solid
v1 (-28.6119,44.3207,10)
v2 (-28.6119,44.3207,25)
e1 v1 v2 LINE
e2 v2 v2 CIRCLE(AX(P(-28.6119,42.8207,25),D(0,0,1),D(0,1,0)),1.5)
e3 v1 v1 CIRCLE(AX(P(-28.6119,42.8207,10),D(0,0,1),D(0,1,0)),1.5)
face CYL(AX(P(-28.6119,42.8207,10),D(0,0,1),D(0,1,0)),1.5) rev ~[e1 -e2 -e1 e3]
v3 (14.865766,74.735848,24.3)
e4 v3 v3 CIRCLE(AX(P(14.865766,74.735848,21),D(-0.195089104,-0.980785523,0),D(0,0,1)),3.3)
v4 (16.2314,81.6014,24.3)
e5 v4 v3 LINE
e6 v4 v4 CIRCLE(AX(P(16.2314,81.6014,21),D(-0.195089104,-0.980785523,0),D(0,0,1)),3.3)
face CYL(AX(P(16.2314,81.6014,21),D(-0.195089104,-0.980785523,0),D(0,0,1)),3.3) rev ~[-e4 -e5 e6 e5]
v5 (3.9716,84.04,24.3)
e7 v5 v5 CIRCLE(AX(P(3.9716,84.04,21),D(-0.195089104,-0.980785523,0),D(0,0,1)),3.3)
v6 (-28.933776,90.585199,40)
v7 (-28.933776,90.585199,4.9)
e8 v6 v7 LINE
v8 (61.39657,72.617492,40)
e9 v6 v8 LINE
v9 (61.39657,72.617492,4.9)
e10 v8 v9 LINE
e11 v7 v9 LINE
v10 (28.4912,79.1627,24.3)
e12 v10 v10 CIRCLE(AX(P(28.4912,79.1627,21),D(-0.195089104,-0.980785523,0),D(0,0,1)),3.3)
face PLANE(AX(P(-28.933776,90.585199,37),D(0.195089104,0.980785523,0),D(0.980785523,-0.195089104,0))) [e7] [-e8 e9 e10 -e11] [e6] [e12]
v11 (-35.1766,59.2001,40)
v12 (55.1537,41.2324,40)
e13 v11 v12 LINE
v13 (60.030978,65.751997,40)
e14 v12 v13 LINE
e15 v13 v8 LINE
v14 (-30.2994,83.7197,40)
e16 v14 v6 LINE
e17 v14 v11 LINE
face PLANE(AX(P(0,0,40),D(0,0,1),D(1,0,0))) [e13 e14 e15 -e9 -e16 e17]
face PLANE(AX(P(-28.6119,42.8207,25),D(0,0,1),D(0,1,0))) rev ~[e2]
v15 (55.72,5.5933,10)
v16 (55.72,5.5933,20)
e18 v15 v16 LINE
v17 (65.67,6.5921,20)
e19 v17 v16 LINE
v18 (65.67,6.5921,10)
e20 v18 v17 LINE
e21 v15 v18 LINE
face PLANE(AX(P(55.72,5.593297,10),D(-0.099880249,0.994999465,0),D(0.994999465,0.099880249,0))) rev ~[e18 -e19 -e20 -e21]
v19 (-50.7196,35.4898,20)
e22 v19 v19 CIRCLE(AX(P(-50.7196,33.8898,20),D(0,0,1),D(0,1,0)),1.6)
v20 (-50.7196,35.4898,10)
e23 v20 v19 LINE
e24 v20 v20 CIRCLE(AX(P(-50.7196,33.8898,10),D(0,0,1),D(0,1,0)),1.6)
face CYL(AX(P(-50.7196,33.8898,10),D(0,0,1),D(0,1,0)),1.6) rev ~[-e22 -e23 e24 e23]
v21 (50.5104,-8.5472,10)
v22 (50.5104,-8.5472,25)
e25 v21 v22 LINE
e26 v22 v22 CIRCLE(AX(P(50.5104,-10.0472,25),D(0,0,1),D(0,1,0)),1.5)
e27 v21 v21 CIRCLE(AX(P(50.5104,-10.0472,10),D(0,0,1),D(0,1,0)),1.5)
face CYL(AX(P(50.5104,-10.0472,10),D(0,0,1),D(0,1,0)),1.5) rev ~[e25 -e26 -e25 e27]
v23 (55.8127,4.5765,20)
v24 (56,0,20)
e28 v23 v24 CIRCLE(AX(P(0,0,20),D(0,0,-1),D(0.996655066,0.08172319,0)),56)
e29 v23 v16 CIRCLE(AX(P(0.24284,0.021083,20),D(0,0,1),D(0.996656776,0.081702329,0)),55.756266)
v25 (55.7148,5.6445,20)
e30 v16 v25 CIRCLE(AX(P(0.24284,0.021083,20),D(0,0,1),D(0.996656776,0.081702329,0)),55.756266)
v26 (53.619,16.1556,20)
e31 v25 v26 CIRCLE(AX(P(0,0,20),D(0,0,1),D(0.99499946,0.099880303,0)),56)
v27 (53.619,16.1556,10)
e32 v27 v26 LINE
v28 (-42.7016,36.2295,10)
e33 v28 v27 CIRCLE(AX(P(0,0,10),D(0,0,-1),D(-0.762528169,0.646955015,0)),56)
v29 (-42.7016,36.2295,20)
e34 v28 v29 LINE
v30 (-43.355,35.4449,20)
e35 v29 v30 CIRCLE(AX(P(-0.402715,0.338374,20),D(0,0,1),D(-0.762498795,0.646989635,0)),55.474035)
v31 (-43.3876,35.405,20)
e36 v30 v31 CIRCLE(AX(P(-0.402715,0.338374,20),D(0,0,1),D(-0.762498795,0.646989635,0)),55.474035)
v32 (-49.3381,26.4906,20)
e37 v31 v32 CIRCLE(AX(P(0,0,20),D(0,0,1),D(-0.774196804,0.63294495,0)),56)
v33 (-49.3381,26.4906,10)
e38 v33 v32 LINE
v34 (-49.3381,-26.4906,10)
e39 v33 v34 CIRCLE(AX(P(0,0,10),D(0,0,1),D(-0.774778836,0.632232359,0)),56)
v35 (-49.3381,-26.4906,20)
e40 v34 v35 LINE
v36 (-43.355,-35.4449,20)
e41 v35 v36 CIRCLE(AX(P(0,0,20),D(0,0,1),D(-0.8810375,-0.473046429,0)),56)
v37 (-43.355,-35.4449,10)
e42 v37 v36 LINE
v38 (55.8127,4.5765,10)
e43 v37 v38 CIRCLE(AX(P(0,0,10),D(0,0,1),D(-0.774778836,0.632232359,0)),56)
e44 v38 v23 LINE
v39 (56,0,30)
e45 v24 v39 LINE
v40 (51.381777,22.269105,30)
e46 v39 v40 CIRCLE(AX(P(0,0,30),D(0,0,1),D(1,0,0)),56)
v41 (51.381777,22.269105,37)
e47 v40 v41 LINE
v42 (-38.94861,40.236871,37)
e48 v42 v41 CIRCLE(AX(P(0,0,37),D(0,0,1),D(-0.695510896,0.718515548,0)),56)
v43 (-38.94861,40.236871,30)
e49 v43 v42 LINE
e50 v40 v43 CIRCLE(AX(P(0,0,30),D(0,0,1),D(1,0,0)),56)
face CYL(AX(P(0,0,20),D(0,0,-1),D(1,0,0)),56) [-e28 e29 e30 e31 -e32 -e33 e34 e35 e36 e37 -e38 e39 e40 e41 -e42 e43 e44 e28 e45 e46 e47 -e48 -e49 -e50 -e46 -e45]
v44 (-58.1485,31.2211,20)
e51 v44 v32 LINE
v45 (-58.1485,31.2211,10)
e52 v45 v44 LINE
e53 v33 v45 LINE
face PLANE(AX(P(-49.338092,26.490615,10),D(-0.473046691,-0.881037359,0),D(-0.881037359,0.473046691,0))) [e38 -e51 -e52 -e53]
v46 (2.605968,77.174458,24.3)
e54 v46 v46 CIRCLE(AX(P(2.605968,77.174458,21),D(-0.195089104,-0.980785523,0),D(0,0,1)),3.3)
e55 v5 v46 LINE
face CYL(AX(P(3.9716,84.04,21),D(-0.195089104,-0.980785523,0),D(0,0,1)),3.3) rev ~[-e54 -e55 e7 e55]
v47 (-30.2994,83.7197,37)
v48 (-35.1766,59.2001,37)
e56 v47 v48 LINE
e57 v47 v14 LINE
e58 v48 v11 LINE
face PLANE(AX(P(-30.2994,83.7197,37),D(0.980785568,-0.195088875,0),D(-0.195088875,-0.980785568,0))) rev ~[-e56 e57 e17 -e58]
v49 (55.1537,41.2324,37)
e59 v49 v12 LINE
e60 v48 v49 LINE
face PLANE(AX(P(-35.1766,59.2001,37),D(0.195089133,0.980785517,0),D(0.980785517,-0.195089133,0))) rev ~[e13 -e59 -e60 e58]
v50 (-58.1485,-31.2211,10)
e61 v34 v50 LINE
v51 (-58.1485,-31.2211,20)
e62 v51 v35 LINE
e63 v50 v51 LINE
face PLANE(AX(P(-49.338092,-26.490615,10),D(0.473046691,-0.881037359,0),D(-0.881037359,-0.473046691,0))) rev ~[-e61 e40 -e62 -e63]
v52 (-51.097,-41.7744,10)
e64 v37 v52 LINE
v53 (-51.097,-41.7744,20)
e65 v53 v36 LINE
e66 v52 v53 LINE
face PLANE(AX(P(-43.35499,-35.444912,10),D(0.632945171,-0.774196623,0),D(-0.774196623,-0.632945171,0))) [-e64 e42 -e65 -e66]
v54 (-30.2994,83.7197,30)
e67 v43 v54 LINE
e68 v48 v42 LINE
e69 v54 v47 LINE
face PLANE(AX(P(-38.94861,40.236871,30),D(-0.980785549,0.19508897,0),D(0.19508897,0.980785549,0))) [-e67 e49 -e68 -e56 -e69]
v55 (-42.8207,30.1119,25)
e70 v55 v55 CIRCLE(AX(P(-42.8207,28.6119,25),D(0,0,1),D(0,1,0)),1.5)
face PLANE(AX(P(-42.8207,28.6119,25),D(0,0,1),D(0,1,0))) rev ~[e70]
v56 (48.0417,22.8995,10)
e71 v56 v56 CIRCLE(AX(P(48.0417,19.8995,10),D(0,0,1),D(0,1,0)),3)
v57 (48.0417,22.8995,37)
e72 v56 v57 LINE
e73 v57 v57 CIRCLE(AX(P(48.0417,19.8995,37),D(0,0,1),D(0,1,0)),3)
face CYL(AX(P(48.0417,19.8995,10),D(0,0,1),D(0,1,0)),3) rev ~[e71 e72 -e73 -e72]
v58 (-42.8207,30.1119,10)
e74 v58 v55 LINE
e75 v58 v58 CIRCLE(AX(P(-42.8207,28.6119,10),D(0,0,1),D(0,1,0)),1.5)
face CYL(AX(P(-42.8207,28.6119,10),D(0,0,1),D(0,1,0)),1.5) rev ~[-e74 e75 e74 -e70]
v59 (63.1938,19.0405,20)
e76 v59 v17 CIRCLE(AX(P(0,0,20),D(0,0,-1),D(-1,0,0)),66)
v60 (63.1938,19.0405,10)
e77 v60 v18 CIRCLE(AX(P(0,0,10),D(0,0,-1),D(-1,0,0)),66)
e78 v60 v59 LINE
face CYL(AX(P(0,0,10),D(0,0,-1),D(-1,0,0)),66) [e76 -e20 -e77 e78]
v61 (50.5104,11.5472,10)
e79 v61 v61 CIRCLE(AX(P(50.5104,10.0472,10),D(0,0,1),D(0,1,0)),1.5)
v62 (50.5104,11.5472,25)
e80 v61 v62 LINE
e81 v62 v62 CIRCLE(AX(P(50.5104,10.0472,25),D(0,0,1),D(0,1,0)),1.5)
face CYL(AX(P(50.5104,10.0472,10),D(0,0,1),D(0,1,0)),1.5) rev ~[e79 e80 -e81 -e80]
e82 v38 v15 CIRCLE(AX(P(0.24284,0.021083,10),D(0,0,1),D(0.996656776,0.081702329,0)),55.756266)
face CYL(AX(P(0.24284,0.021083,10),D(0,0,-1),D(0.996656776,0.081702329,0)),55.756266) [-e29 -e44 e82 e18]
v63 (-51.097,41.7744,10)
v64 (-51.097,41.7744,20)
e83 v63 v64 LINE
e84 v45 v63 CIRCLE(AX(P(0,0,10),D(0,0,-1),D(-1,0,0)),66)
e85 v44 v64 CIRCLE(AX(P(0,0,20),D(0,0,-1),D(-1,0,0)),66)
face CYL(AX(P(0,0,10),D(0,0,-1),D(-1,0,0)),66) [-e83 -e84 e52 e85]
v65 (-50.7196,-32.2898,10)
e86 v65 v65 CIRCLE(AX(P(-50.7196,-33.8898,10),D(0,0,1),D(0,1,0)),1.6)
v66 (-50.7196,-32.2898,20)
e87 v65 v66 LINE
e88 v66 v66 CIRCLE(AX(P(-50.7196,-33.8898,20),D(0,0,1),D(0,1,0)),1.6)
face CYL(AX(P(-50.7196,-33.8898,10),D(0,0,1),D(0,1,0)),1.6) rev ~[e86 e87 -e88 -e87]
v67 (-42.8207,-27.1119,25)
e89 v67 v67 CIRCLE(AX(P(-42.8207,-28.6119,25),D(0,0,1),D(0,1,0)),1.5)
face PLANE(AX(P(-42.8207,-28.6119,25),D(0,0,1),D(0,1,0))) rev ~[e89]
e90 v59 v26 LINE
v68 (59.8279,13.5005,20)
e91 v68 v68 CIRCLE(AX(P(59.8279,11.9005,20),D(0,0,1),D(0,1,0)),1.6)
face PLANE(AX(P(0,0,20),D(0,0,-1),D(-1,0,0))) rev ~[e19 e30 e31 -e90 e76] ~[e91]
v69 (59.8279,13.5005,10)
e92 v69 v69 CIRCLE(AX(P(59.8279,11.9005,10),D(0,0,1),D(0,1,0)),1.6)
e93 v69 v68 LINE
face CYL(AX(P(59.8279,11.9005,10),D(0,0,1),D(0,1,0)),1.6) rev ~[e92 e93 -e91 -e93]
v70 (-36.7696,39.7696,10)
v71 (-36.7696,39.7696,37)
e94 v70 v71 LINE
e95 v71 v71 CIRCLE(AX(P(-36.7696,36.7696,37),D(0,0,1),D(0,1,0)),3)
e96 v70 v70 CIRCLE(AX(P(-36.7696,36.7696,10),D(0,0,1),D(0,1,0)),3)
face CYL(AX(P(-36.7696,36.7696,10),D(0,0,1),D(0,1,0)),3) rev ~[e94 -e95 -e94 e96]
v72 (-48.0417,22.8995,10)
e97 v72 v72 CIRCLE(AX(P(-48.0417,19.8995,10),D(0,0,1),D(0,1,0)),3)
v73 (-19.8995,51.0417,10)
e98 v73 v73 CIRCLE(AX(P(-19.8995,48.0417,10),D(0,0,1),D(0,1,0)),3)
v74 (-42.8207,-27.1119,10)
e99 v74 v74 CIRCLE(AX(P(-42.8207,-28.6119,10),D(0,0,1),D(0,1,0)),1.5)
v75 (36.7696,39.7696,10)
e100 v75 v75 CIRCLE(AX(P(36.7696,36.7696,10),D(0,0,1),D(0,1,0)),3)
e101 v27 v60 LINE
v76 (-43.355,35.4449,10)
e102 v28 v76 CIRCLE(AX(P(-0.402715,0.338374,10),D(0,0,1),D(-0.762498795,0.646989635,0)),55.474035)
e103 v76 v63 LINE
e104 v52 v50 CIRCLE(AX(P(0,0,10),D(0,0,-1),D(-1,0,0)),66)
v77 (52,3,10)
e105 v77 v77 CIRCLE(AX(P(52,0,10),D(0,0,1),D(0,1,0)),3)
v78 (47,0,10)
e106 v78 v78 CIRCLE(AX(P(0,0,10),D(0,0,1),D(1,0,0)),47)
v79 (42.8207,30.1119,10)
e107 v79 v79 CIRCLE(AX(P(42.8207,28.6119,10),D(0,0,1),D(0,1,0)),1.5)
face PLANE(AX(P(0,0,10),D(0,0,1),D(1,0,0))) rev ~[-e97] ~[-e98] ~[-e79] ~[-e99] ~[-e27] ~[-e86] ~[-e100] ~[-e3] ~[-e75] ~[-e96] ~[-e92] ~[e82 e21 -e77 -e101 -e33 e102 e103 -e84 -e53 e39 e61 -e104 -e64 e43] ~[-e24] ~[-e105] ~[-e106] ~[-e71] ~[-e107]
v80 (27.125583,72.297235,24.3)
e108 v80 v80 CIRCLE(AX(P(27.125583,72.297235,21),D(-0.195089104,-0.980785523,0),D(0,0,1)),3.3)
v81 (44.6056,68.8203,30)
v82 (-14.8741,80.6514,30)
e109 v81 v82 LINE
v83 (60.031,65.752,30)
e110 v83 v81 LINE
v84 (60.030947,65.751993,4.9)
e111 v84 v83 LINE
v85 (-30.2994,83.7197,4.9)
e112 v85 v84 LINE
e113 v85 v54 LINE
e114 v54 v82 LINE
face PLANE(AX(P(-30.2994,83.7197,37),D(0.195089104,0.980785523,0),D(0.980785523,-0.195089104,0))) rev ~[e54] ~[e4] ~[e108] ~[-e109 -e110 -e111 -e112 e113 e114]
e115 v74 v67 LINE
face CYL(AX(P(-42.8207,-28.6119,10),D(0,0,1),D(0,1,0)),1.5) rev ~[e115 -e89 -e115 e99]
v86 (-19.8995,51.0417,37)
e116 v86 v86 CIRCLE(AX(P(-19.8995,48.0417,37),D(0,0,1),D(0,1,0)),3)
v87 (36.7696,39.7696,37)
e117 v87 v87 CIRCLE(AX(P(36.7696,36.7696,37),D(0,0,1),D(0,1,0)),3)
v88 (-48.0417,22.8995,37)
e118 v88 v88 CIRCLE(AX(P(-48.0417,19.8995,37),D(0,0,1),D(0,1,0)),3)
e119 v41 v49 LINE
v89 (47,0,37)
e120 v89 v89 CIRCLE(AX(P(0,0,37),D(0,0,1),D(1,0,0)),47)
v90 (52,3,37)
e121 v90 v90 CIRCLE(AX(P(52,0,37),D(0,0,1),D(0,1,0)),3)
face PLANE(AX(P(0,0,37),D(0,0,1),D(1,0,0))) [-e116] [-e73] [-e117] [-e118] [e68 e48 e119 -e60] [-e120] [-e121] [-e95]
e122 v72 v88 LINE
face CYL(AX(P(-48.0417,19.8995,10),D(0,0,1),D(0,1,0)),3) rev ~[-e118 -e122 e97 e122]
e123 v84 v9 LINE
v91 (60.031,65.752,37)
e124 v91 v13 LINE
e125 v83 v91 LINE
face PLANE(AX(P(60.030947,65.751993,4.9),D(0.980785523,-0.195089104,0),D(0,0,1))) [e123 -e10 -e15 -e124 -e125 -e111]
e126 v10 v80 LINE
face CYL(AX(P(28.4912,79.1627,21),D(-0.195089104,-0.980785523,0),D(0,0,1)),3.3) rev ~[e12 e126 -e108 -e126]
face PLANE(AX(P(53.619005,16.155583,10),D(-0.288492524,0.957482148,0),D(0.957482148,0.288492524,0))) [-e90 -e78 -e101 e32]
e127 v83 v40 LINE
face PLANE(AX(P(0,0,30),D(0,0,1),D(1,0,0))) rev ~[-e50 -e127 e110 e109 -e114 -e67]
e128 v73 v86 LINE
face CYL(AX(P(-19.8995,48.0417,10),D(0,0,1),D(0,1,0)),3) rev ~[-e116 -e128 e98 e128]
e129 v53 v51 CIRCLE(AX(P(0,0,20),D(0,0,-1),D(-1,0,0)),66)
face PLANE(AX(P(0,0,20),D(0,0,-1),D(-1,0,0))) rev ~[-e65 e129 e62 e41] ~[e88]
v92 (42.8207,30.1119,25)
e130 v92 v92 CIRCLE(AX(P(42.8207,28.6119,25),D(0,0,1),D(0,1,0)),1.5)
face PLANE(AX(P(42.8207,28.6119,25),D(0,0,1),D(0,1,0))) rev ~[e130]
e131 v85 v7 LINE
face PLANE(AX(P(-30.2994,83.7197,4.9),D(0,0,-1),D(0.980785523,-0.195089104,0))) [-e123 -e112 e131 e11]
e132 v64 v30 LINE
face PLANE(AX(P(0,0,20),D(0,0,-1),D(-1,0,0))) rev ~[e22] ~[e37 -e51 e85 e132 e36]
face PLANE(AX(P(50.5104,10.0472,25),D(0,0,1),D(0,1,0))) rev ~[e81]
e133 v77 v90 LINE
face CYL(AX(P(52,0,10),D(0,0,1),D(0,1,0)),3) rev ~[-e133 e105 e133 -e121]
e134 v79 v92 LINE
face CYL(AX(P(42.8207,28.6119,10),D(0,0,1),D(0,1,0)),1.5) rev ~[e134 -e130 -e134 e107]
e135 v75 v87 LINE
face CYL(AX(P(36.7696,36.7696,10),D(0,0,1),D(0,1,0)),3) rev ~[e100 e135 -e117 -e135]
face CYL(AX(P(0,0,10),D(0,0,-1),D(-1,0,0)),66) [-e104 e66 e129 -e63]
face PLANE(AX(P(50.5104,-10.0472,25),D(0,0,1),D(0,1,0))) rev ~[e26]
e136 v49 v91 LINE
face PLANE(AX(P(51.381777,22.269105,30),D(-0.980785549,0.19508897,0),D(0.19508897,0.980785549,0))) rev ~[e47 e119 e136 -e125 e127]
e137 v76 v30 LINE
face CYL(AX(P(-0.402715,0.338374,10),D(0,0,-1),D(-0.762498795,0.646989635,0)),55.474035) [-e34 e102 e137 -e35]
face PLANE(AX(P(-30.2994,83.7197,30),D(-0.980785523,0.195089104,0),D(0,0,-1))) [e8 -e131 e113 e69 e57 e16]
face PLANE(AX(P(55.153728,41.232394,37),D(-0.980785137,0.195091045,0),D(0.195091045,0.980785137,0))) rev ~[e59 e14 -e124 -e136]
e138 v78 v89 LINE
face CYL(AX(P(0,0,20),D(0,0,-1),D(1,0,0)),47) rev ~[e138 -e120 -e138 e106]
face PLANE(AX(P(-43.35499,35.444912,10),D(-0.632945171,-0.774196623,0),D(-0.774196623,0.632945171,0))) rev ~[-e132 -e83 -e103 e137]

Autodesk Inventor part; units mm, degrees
sketch "Skizze1" plane through (0, 0, 0) normal (0, 0, 1) x (1, 0, 0)
  circle A0 centre (0, 0) radius 47
  circle A1 centre (0, 0) radius 56
  circle A2 centre (0, 0) radius 51.5
  circle A3 centre (-28.6119, 42.8207) radius 6
  circle A4 centre (-42.8207, 28.6119) radius 6
  circle A5 centre (42.8207, 28.6119) radius 6
  circle A6 centre (50.5104, 10.0472) radius 6
  circle A7 centre (-10.0472, -50.5104) radius 6
  circle A8 centre (-28.6119, 42.8207) radius 5
  circle A9 centre (-42.8207, 28.6119) radius 5
  circle A10 centre (-10.0472, -50.5104) radius 5
  circle A11 centre (50.5104, 10.0472) radius 5
  circle A12 centre (42.8207, 28.6119) radius 5
  line L0 (0, 0) -> (-25.4753, 49.8699)
  line L1 (0, 0) -> (-26.4443, 49.3629)
  line L2 (0, 0) -> (-36.3248, 42.6205)
  line L3 (0, 0) -> (-35.4856, 43.3218)
  line L4 (0, 0) -> (-42.6205, 36.3248)
  line L5 (0, 0) -> (-49.3629, 26.4443)
  line L6 (0, 0) -> (-49.8699, 25.4753)
  line L7 (0, 0) -> (-43.3218, 35.4856)
  line L8 (0, 0) -> (-16.2059, -53.6038)
  line L9 (0, 0) -> (-17.2496, -53.2771)
  line L10 (0, 0) -> (-5.541, -55.7252)
  line L11 (0, 0) -> (-4.4517, -55.8228)
  line L12 (0, 0) -> (43.3218, 35.4856)
  line L13 (0, 0) -> (42.6205, 36.3248)
  line L14 (0, 0) -> (49.3629, 26.4443)
  line L15 (0, 0) -> (49.8699, 25.4753)
  line L16 (0, 0) -> (53.6038, 16.2059)
  line L17 (0, 0) -> (53.2771, 17.2496)
  line L18 (0, 0) -> (55.7252, 5.541)
  line L19 (0, 0) -> (55.8228, 4.4517)
  line L20 (0, 0) -> (-54.924, 10.9251)
  line L21 (0, 0) -> (54.924, -10.9251)
  line L22 (0, 0) -> (10.0472, 50.5104)
  point P0 (0, 51.5)
  point P1 (-10.0472, 50.5104)
  point P2 (-19.7082, 47.5798)
  point P3 (-36.416, 36.416)
  point P4 (-47.5798, 19.7082)
  point P5 (-50.5104, 10.0472)
  point P6 (-51.5, 0)
  point P7 (-50.5104, -10.0472)
  point P8 (-47.5798, -19.7082)
  point P9 (-42.8207, -28.6119)
  point P10 (-36.416, -36.416)
  point P11 (-28.6119, -42.8207)
  point P12 (-19.7082, -47.5798)
  point P13 (0, -51.5)
  point P14 (10.0472, -50.5104)
  point P15 (19.7082, -47.5798)
  point P16 (28.6119, -42.8207)
  point P17 (36.416, -36.416)
  point P18 (42.8207, -28.6119)
  point P19 (47.5798, -19.7082)
  point P20 (50.5104, -10.0472)
  point P21 (51.5, 0)
  point P22 (47.5798, 19.7082)
  point P23 (36.416, 36.416)
  point P24 (28.6119, 42.8207)
  point P25 (19.7082, 47.5798)
  point P26 (-41.8551, 21.3811)
  point P27 (-41.4296, 22.1944)
  point P28 (-36.3593, 29.7825)
  point P29 (-35.7708, 30.4869)
  point P30 (-30.3782, 37.0866)
  point P31 (-30.4869, 35.7708)
  point P32 (-29.1766, 36.8473)
  point P33 (-22.6383, 42.2582)
  point P34 (-22.8771, 41.0565)
  point P35 (-21.3811, 41.8551)
  point P36 (-14.4773, -44.7147)
  point P37 (-13.6014, -44.9889)
  point P38 (-3.7363, -46.8513)
  point P39 (-4.6505, -46.7694)
  point P40 (46.7694, 4.6505)
  point P41 (46.8513, 3.7363)
  point P42 (44.7147, 14.4773)
  point P43 (44.9889, 13.6014)
  point P44 (41.4296, 22.1944)
  point P45 (41.8551, 21.3811)
  point P46 (35.7708, 30.4869)
  point P47 (36.3593, 29.7825)
  dimension "d1" = 112
  dimension "d2" = 103
  dimension "d0" = 94
  dimension "d5" = 360
  dimension "d7" = 12
  dimension "d8" = 12
  dimension "d9" = 12
  dimension "d10" = 12
  dimension "d11" = 12
  dimension "d12" = 10
  dimension "d13" = 10
  dimension "d14" = 10
  dimension "d15" = 10
  dimension "d16" = 10
ref_plane "Arbeitsebene1" through (0, 0, 10) normal (0, 0, 1) x (1, 0, 0)
sketch "Skizze2" plane through (0, 0, 10) normal (0, 0, 1) x (1, 0, 0)
  circle A0 centre (0, 0) radius 47
  circle A1 centre (0, 0) radius 56
  arc A2 (-42.7016, 36.2295) -> (-43.3876, 35.405) centre (0, 0) ccw projected
  line L0 (0, 0) -> (-25.5867, 49.8129)
  arc A3 (55.8127, 4.5765) -> (55.7148, 5.6445) centre (0, 0) ccw projected
  line L1 (-22.3883, 43.5863) -> (-25.5867, 49.8129) projected
  circle A4 centre (0, 0) radius 47
  circle A5 centre (0, 0) radius 56
  circle A6 centre (0, 0) radius 52.5
  line L2 (0, 0) -> (-25.5867, 49.8129)
  point P0 (-21.4745, 41.8072)
  point P1 (0, 52.5)
  point P2 (-10.2422, 51.4912)
  point P3 (-20.0909, 48.5037)
  point P4 (-29.1674, 43.6522)
  point P5 (-37.1231, 37.1231)
  point P6 (-43.6522, 29.1674)
  point P7 (-48.5037, 20.0909)
  point P8 (-51.4912, 10.2422)
  point P9 (-52.5, 0)
  point P10 (-51.4912, -10.2422)
  point P11 (-48.5037, -20.0909)
  point P12 (-43.6522, -29.1674)
  point P13 (-37.1231, -37.1231)
  point P14 (-29.1674, -43.6522)
  point P15 (-20.0909, -48.5037)
  point P16 (-10.2422, -51.4912)
  point P17 (0, -52.5)
  point P18 (10.2422, -51.4912)
  point P19 (20.0909, -48.5037)
  point P20 (29.1674, -43.6522)
  point P21 (37.1231, -37.1231)
  point P22 (43.6522, -29.1674)
  point P23 (48.5037, -20.0909)
  point P24 (51.4912, -10.2422)
  point P25 (52.5, 0)
  point P26 (51.4912, 10.2422)
  point P27 (48.5037, 20.0909)
  point P28 (43.6522, 29.1674)
  point P29 (37.1231, 37.1231)
  point P30 (29.1674, 43.6522)
  point P31 (20.0909, 48.5037)
  point P32 (10.2422, 51.4912)
  point P33 (-43.5863, 22.3883)
  point P34 (-43.1495, 23.219)
  point P35 (-37.9642, 30.9794)
  point P36 (-37.3639, 31.7008)
  point P37 (-30.9445, 37.9213)
  point P38 (-31.7008, 37.3639)
  point P39 (-31.0074, 37.9413)
  point P40 (-23.1928, 43.1008)
  point P41 (-23.1871, 43.1666)
  point P42 (-14.9892, -46.6511)
  point P43 (-14.093, -46.9296)
  point P44 (-4.0044, -48.8361)
  point P45 (-4.939, -48.7505)
  point P46 (48.7505, 4.939)
  point P47 (48.8361, 4.0044)
  point P48 (46.6511, 14.9892)
  point P49 (46.9296, 14.093)
  point P50 (43.1495, 23.219)
  point P51 (43.5863, 22.3883)
  point P52 (37.3639, 31.7008)
  point P53 (37.9642, 30.9794)
  dimension "d19" = 94
  dimension "d81" = 112
  dimension "d82" = 105
  dimension "d20" = 112
  dimension "d80" = 94
  dimension "d83" = 360
extrude "Extrusion2" add sketch "Skizze2" along normal blind 10 contours A1 | A6
ref_plane "Arbeitsebene2" through (0, 0, 20) normal (0, 0, 1) x (1, 0, 0)
sketch "Skizze3" plane through (0, 0, 20) normal (0, 0, 1) x (1, 0, 0)
  circle A0 centre (0, 0) radius 47
  circle A1 centre (0, 0) radius 56
  dimension "d30" = 94
  dimension "d31" = 112
extrude "Extrusion3" add sketch "Skizze3" along normal blind 10
ref_plane "Arbeitsebene3" through (0, 0, 30) normal (0, 0, 1) x (1, 0, 0)
sketch "Skizze4" plane through (0, 0, 30) normal (0, 0, 1) x (1, 0, 0)
  circle A0 centre (0, 0) radius 49 projected
  line L0 (-22.188, 43.8818) -> (37.2918, 32.0506)
  line L1 (37.2918, 32.0506) -> (44.6056, 68.8203)
  line L2 (44.6056, 68.8203) -> (-14.8741, 80.6514)
  line L3 (-14.8741, 80.6514) -> (-22.188, 43.8818)
  line L4 (44.6056, 68.8203) -> (37.2918, 32.0506)
  line L5 (37.2918, 32.0506) -> (52.7171, 28.9824)
  line L6 (48.4587, 7.5737) -> (60.031, 65.752)
  line L7 (60.031, 65.752) -> (44.6056, 68.8203)
  line L8 (-14.8741, 80.6514) -> (-22.188, 43.8818)
  line L9 (-22.188, 43.8818) -> (-37.6133, 46.9501)
  line L10 (-41.8717, 25.5414) -> (-30.2994, 83.7197)
  line L11 (-30.2994, 83.7197) -> (-14.8741, 80.6514)
  circle A1 centre (0, 0) radius 56
  circle A2 centre (0, 0) radius 47
  point P0 (-38.9486, 40.2369)
  point P1 (51.3817, 22.2692)
  point P2 (-22.174, 43.6957)
  point P3 (37.2076, 31.884)
  point P4 (-41.8227, 25.5317)
  point P5 (48.4096, 7.5835)
  point P6 (37.0169, 32.1053)
  point P7 (-21.9131, 43.8271)
  dimension "AuslegerBreite" = 92.1
  dimension "d34" = 37.49
  dimension "d37" = 15.7275
  dimension "d38" = 15.7275
  dimension "d39" = 92.1
  dimension "d40" = 60.645
  dimension "d55" = 112
  dimension "d136" = 98
  dimension "d137" = 94
  dimension "d138" = 76.2
extrude "Extrusion4" add sketch "Skizze4" along normal blind 7 contours A0 L0 A2 | A0 L0 L5 A1 L9 | L0 A2 A0 | A0 L0 L3 A1 L1 | L1 A1 L5 | L9 A1 L3 | A1 L3 L2 L1 | L1 L7 L6 L5 A1 | L5 L6 A1 | A1 L9 L10 L11 L3 | A1 L10 L9
ref_plane "Arbeitsebene4" through (0, 0, 45) normal (0, 0, 1) x (1, 0, 0)
sketch "Skizze7" plane through (0, 0, 10) normal (0, 0, 1) x (1, 0, 0)
  circle A0 centre (0, 0) radius 47
  circle A1 centre (0, 0) radius 56
  circle A2 centre (0, 0) radius 52.5
  circle A3 centre (-29.1674, 43.6522) radius 6
  circle A4 centre (-43.6522, 29.1674) radius 6
  circle A5 centre (43.6522, 29.1674) radius 6
  circle A6 centre (51.4912, 10.2422) radius 6
  circle A7 centre (-10.2422, -51.4912) radius 6
  circle A8 centre (-29.1674, 43.6522) radius 5
  circle A9 centre (-43.6522, 29.1674) radius 5
  circle A10 centre (-10.2422, -51.4912) radius 5
  circle A11 centre (51.4912, 10.2422) radius 5
  circle A12 centre (43.6522, 29.1674) radius 5
  line L0 (0, 0) -> (-25.5867, 49.8129)
  line L1 (0, 0) -> (-26.536, 49.3137)
  line L2 (0, 0) -> (-36.2295, 42.7016)
  line L3 (0, 0) -> (-35.405, 43.3876)
  line L4 (0, 0) -> (-42.7016, 36.2295)
  line L5 (0, 0) -> (-49.3137, 26.536)
  line L6 (0, 0) -> (-49.8129, 25.5867)
  line L7 (0, 0) -> (-43.3876, 35.405)
  line L8 (0, 0) -> (-16.1063, -53.6338)
  line L9 (0, 0) -> (-17.1305, -53.3155)
  line L10 (0, 0) -> (-5.6445, -55.7148)
  line L11 (0, 0) -> (-4.5765, -55.8127)
  line L12 (0, 0) -> (43.3876, 35.405)
  line L13 (0, 0) -> (42.7016, 36.2295)
  line L14 (0, 0) -> (49.3137, 26.536)
  line L15 (0, 0) -> (49.8129, 25.5867)
  line L16 (0, 0) -> (53.6338, 16.1063)
  line L17 (0, 0) -> (53.3155, 17.1305)
  line L18 (0, 0) -> (55.7148, 5.6445)
  line L19 (0, 0) -> (55.8127, 4.5765)
  line L20 (0, 0) -> (-54.924, 10.9251)
  line L21 (0, 0) -> (54.924, -10.9251)
  point P0 (0, 52.5)
  point P1 (-10.2422, 51.4912)
  point P2 (-20.0909, 48.5037)
  point P3 (-37.1231, 37.1231)
  point P4 (-48.5037, 20.0909)
  point P5 (-51.4912, 10.2422)
  point P6 (-52.5, 0)
  point P7 (-51.4912, -10.2422)
  point P8 (-48.5037, -20.0909)
  point P9 (-43.6522, -29.1674)
  point P10 (-37.1231, -37.1231)
  point P11 (-29.1674, -43.6522)
  point P12 (-20.0909, -48.5037)
  point P13 (0, -52.5)
  point P14 (10.2422, -51.4912)
  point P15 (20.0909, -48.5037)
  point P16 (29.1674, -43.6522)
  point P17 (37.1231, -37.1231)
  point P18 (43.6522, -29.1674)
  point P19 (48.5037, -20.0909)
  point P20 (51.4912, -10.2422)
  point P21 (52.5, 0)
  point P22 (48.5037, 20.0909)
  point P23 (37.1231, 37.1231)
  point P24 (29.1674, 43.6522)
  point P25 (20.0909, 48.5037)
  point P26 (10.2422, 51.4912)
  point P27 (-43.5863, 22.3883)
  point P28 (-43.1495, 23.219)
  point P29 (-37.9642, 30.9794)
  point P30 (-37.3639, 31.7008)
  point P31 (-30.9445, 37.9213)
  point P32 (-31.7008, 37.3639)
  point P33 (-31.0074, 37.9413)
  point P34 (-23.1928, 43.1008)
  point P35 (-23.1871, 43.1666)
  point P36 (-22.3883, 43.5863)
  point P37 (-14.9892, -46.6511)
  point P38 (-14.093, -46.9296)
  point P39 (-4.0044, -48.8361)
  point P40 (-4.939, -48.7505)
  point P41 (48.7505, 4.939)
  point P42 (48.8361, 4.0044)
  point P43 (46.6511, 14.9892)
  point P44 (46.9296, 14.093)
  point P45 (43.1495, 23.219)
  point P46 (43.5863, 22.3883)
  point P47 (37.3639, 31.7008)
  point P48 (37.9642, 30.9794)
  point P49 (51.4912, -10.2422)
  point P50 (52.3244, 4.2904)
  point P51 (-51.4912, 10.2422)
  point P52 (-46.0969, 9.1692)
  point P53 (-41.8072, 21.4745)
  point P54 (-46.6996, 23.9875)
  point P55 (46.0969, -9.1692)
  point P56 (46.8428, 3.8409)
  dimension "d59" = 112
  dimension "d60" = 105
  dimension "d58" = 94
  dimension "d61" = 360
  dimension "d62" = 12
  dimension "d63" = 12
  dimension "d64" = 12
  dimension "d65" = 12
  dimension "d66" = 12
  dimension "d67" = 10
  dimension "d68" = 10
  dimension "d69" = 10
  dimension "d70" = 10
  dimension "d71" = 10
sketch "Skizze8" plane through (0, 0, 10) normal (0, 0, -1) x (-1, 0, 0)
  circle A0 centre (0, 0) radius 47
  circle A1 centre (0, 0) radius 56
  circle A2 centre (0, 0) radius 52
  circle A3 centre (0, 52) radius 2.5
  circle A4 centre (-19.8995, 48.0417) radius 2.5
  circle A5 centre (-36.7696, 36.7696) radius 2.5
  circle A6 centre (-48.0417, 19.8995) radius 2.5
  circle A7 centre (-52, 0) radius 2.5
  circle A8 centre (-48.0417, -19.8995) radius 2.5
  circle A9 centre (-36.7696, -36.7696) radius 2.5
  circle A10 centre (-19.8995, -48.0417) radius 2.5
  circle A11 centre (0, -52) radius 2.5
  circle A12 centre (19.8995, -48.0417) radius 2.5
  circle A13 centre (36.7696, -36.7696) radius 2.5
  circle A14 centre (48.0417, -19.8995) radius 2.5
  circle A15 centre (52, 0) radius 2.5
  circle A16 centre (48.0417, 19.8995) radius 2.5
  circle A17 centre (36.7696, 36.7696) radius 2.5
  circle A18 centre (19.8995, 48.0417) radius 2.5
  circle A19 centre (0, -52) radius 3.5
  circle A20 centre (19.8995, -48.0417) radius 3.5
  line L0 (0, 0) -> (-3.7692, -55.873)
  line L1 (0, 0) -> (24.864, -50.1775)
  line L2 (-54.924, -10.9251) -> (-48.0585, -9.5594)
  line L3 (0, 0) -> (-54.924, -10.9251)
  line L4 (48.0585, 9.5594) -> (54.924, 10.9251)
  line L5 (0, 0) -> (54.924, 10.9251)
  circle A21 centre (0, 0) radius 47
  line L6 (-27.2229, 40.742) -> (-31.1119, 46.5623)
  line L7 (0, 0) -> (-31.1119, 46.5623)
  line L8 (10.9251, 54.924) -> (9.5594, 48.0585)
  line L9 (0, 0) -> (10.9251, 54.924)
  circle A22 centre (0, 52) radius 2.5
  circle A23 centre (-10.1447, 51.0008) radius 2.5
  circle A24 centre (-19.8995, 48.0417) radius 2.5
  circle A25 centre (-28.8897, 43.2364) radius 2.5
  circle A26 centre (-36.7696, 36.7696) radius 2.5
  circle A27 centre (-43.2364, 28.8897) radius 2.5
  circle A28 centre (-48.0417, 19.8995) radius 2.5
  circle A29 centre (-51.0008, 10.1447) radius 2.5
  circle A30 centre (-52, 0) radius 2.5
  circle A31 centre (-51.0008, -10.1447) radius 2.5
  circle A32 centre (-48.0417, -19.8995) radius 2.5
  circle A33 centre (-43.2364, -28.8897) radius 2.5
  circle A34 centre (-36.7696, -36.7696) radius 2.5
  circle A35 centre (-28.8897, -43.2364) radius 2.5
  circle A36 centre (-19.8995, -48.0417) radius 2.5
  circle A37 centre (-10.1447, -51.0008) radius 2.5
  circle A38 centre (0, -52) radius 2.5
  circle A39 centre (10.1447, -51.0008) radius 2.5
  circle A40 centre (19.8995, -48.0417) radius 2.5
  circle A41 centre (28.8897, -43.2364) radius 2.5
  circle A42 centre (36.7696, -36.7696) radius 2.5
  circle A43 centre (43.2364, -28.8897) radius 2.5
  circle A44 centre (48.0417, -19.8995) radius 2.5
  circle A45 centre (51.0008, -10.1447) radius 2.5
  circle A46 centre (52, 0) radius 2.5
  circle A47 centre (51.0008, 10.1447) radius 2.5
  circle A48 centre (48.0417, 19.8995) radius 2.5
  circle A49 centre (43.2364, 28.8897) radius 2.5
  circle A50 centre (36.7696, 36.7696) radius 2.5
  circle A51 centre (28.8897, 43.2364) radius 2.5
  circle A52 centre (19.8995, 48.0417) radius 2.5
  circle A53 centre (10.1447, 51.0008) radius 2.5
  circle A54 centre (28.8897, 43.2364) radius 5 construction
  line L10 (0, 0) -> (26.4906, 49.3381)
  arc A55 (54.924, 10.9251) -> (10.9251, 54.924) centre (0, 0) ccw
  line L11 (0, 0) -> (35.4449, 43.355)
  line L12 (0, 0) -> (5.5933, 55.72)
  line L13 (0, 0) -> (16.1556, 53.619)
  line L14 (0, 0) -> (-16.1556, 53.619)
  line L15 (0, 0) -> (-5.5933, 55.72)
  line L16 (0, 0) -> (-35.4449, 43.355)
  line L17 (0, 0) -> (-26.4906, 49.3381)
  line L18 (0, 0) -> (-49.3381, 26.4906)
  line L19 (0, 0) -> (-43.355, 35.4449)
  line L20 (0, 0) -> (-55.72, 5.5933)
  line L21 (0, 0) -> (-53.619, 16.1556)
  line L22 (0, 0) -> (-53.619, -16.1556)
  line L23 (0, 0) -> (-55.72, -5.5933)
  line L24 (0, 0) -> (-43.355, -35.4449)
  line L25 (0, 0) -> (-49.3381, -26.4906)
  line L26 (0, 0) -> (-26.4906, -49.3381)
  line L27 (0, 0) -> (-35.4449, -43.355)
  line L28 (0, 0) -> (-5.5933, -55.72)
  line L29 (0, 0) -> (-16.1556, -53.619)
  line L30 (0, 0) -> (16.1556, -53.619)
  line L31 (0, 0) -> (5.5933, -55.72)
  line L32 (0, 0) -> (35.4449, -43.355)
  line L33 (0, 0) -> (26.4906, -49.3381)
  line L34 (0, 0) -> (49.3381, -26.4906)
  line L35 (0, 0) -> (43.355, -35.4449)
  line L36 (0, 0) -> (55.72, -5.5933)
  line L37 (0, 0) -> (53.619, -16.1556)
  line L38 (0, 0) -> (53.619, 16.1556)
  line L39 (0, 0) -> (55.72, 5.5933)
  line L40 (0, 0) -> (43.355, 35.4449)
  line L41 (0, 0) -> (49.3381, 26.4906)
  circle A56 centre (0, 0) radius 66
  line L42 (0, 0) -> (51.097, 41.7744)
  line L43 (0, 0) -> (58.1485, 31.2211)
  line L44 (0, 0) -> (6.5921, -65.67)
  line L45 (0, 0) -> (19.0405, -63.1938)
  line L46 (0, 0) -> (-63.1938, 19.0405)
  line L47 (0, 0) -> (-65.67, 6.5921)
  line L48 (0, 0) -> (-59.8279, 11.9005)
  line L49 (0, 0) -> (50.7196, 33.8898)
  line L50 (0, 0) -> (11.9005, -59.8279)
  circle A57 centre (0, 0) radius 49
  circle A58 centre (0, 0) radius 56
  circle A59 centre (0, 0) radius 52
  circle A60 centre (0, 52) radius 2.5
  circle A61 centre (-19.8995, 48.0417) radius 2.5
  circle A62 centre (-36.7696, 36.7696) radius 2.5
  circle A63 centre (-48.0417, 19.8995) radius 2.5
  circle A64 centre (-52, 0) radius 2.5
  circle A65 centre (-48.0417, -19.8995) radius 2.5
  circle A66 centre (-36.7696, -36.7696) radius 2.5
  circle A67 centre (-19.8995, -48.0417) radius 2.5
  circle A68 centre (0, -52) radius 2.5
  circle A69 centre (19.8995, -48.0417) radius 2.5
  circle A70 centre (36.7696, -36.7696) radius 2.5
  circle A71 centre (48.0417, -19.8995) radius 2.5
  circle A72 centre (52, 0) radius 2.5
  circle A73 centre (48.0417, 19.8995) radius 2.5
  circle A74 centre (36.7696, 36.7696) radius 2.5
  circle A75 centre (19.8995, 48.0417) radius 2.5
  circle A76 centre (0, -52) radius 3.5
  circle A77 centre (19.8995, -48.0417) radius 3.5
  line L51 (0, 0) -> (-3.7692, -55.873)
  line L52 (0, 0) -> (24.864, -50.1775)
  line L53 (-54.924, -10.9251) -> (-48.0585, -9.5594)
  line L54 (0, 0) -> (-54.924, -10.9251)
  line L55 (48.0585, 9.5594) -> (54.924, 10.9251)
  line L56 (0, 0) -> (54.924, 10.9251)
  circle A78 centre (0, 0) radius 49
  line L57 (-27.2229, 40.742) -> (-31.1119, 46.5623)
  line L58 (0, 0) -> (-31.1119, 46.5623)
  line L59 (10.9251, 54.924) -> (9.5594, 48.0585)
  line L60 (0, 0) -> (10.9251, 54.924)
  circle A79 centre (0, 52) radius 2.5
  circle A80 centre (-10.1447, 51.0008) radius 2.5
  circle A81 centre (-19.8995, 48.0417) radius 2.5
  circle A82 centre (-28.8897, 43.2364) radius 2.5
  circle A83 centre (-36.7696, 36.7696) radius 2.5
  circle A84 centre (-43.2364, 28.8897) radius 2.5
  circle A85 centre (-48.0417, 19.8995) radius 2.5
  circle A86 centre (-51.0008, 10.1447) radius 2.5
  circle A87 centre (-52, 0) radius 2.5
  circle A88 centre (-51.0008, -10.1447) radius 2.5
  circle A89 centre (-48.0417, -19.8995) radius 2.5
  circle A90 centre (-43.2364, -28.8897) radius 2.5
  circle A91 centre (-36.7696, -36.7696) radius 2.5
  circle A92 centre (-28.8897, -43.2364) radius 2.5
  circle A93 centre (-19.8995, -48.0417) radius 2.5
  circle A94 centre (-10.1447, -51.0008) radius 2.5
  circle A95 centre (0, -52) radius 2.5
  circle A96 centre (10.1447, -51.0008) radius 2.5
  circle A97 centre (19.8995, -48.0417) radius 2.5
  circle A98 centre (28.8897, -43.2364) radius 2.5
  circle A99 centre (36.7696, -36.7696) radius 2.5
  circle A100 centre (43.2364, -28.8897) radius 2.5
  circle A101 centre (48.0417, -19.8995) radius 2.5
  circle A102 centre (51.0008, -10.1447) radius 2.5
  circle A103 centre (52, 0) radius 2.5
  circle A104 centre (51.0008, 10.1447) radius 2.5
  circle A105 centre (48.0417, 19.8995) radius 2.5
  circle A106 centre (43.2364, 28.8897) radius 2.5
  circle A107 centre (36.7696, 36.7696) radius 2.5
  circle A108 centre (28.8897, 43.2364) radius 2.5
  circle A109 centre (19.8995, 48.0417) radius 2.5
  circle A110 centre (10.1447, 51.0008) radius 2.5
  circle A111 centre (28.8897, 43.2364) radius 5 construction
  line L61 (0, 0) -> (26.4906, 49.3381)
  arc A112 (54.924, 10.9251) -> (10.9251, 54.924) centre (0, 0) ccw
  line L62 (0, 0) -> (35.4449, 43.355)
  line L63 (0, 0) -> (5.5933, 55.72)
  line L64 (0, 0) -> (16.1556, 53.619)
  line L65 (0, 0) -> (-16.1556, 53.619)
  line L66 (0, 0) -> (-5.5933, 55.72)
  line L67 (0, 0) -> (-35.4449, 43.355)
  line L68 (0, 0) -> (-26.4906, 49.3381)
  line L69 (0, 0) -> (-49.3381, 26.4906)
  line L70 (0, 0) -> (-43.355, 35.4449)
  line L71 (0, 0) -> (-55.72, 5.5933)
  line L72 (0, 0) -> (-53.619, 16.1556)
  line L73 (0, 0) -> (-53.619, -16.1556)
  line L74 (0, 0) -> (-55.72, -5.5933)
  line L75 (0, 0) -> (-43.355, -35.4449)
  line L76 (0, 0) -> (-49.3381, -26.4906)
  line L77 (0, 0) -> (-26.4906, -49.3381)
  line L78 (0, 0) -> (-35.4449, -43.355)
  line L79 (0, 0) -> (-5.5933, -55.72)
  line L80 (0, 0) -> (-16.1556, -53.619)
  line L81 (0, 0) -> (16.1556, -53.619)
  line L82 (0, 0) -> (5.5933, -55.72)
  line L83 (0, 0) -> (35.4449, -43.355)
  line L84 (0, 0) -> (26.4906, -49.3381)
  line L85 (0, 0) -> (49.3381, -26.4906)
  line L86 (0, 0) -> (43.355, -35.4449)
  line L87 (0, 0) -> (55.72, -5.5933)
  line L88 (0, 0) -> (53.619, -16.1556)
  line L89 (0, 0) -> (53.619, 16.1556)
  line L90 (0, 0) -> (55.72, 5.5933)
  line L91 (0, 0) -> (43.355, 35.4449)
  line L92 (0, 0) -> (49.3381, 26.4906)
  circle A113 centre (0, 0) radius 66
  line L93 (0, 0) -> (51.097, 41.7744)
  line L94 (0, 0) -> (58.1485, 31.2211)
  line L95 (0, 0) -> (6.5921, -65.67)
  line L96 (0, 0) -> (19.0405, -63.1938)
  line L97 (0, 0) -> (-63.1938, 19.0405)
  line L98 (0, 0) -> (-65.67, 6.5921)
  circle A114 centre (0, 0) radius 61
  line L99 (0, 0) -> (-59.8279, 11.9005)
  line L100 (0, 0) -> (50.7196, 33.8898)
  line L101 (0, 0) -> (11.9005, -59.8279)
  line L102 (0, 0) -> (-41.7744, -51.097)
  line L103 (0, 0) -> (-31.2211, -58.1485)
  line L104 (0, 0) -> (-33.8898, -50.7196)
  line L105 (-31.1119, -46.5623) -> (-26.1118, -39.0791)
  line L106 (0, 0) -> (51.097, -41.7744)
  line L107 (0, 0) -> (58.1485, -31.2211)
  line L108 (0, 0) -> (50.7196, -33.8898)
  point P0 (21.756, -43.9053)
  point P1 (-3.2981, -48.8889)
  point P2 (-48.755, 4.8941)
  point P3 (-46.9166, 14.1361)
  point P4 (-43.1708, 23.1793)
  point P5 (-37.9356, 31.0143)
  point P6 (14.1361, -46.9166)
  point P7 (4.8941, -48.755)
  point P8 (37.9356, 31.0143)
  point P9 (43.1708, 23.1793)
  point P10 (23.1793, 43.1708)
  point P11 (31.0143, 37.9356)
  point P12 (45.2701, 18.7515)
  point P13 (34.6482, 34.6482)
  point P14 (18.7515, 45.2701)
  point P15 (-34.6482, 34.6482)
  point P16 (-18.7515, 45.2701)
  point P17 (0, 49)
  point P18 (-45.2701, 18.7515)
  point P19 (-49, 0)
  dimension "d104" = 94
  dimension "d106" = 104
  dimension "d195" = 112
  dimension "d196" = 104
  dimension "d206" = 132
  dimension "d105" = 112
  dimension "d107" = 5
  dimension "d108" = 360
  dimension "d109" = 7
  dimension "d110" = 7
  dimension "d111" = 94
  dimension "d112" = 5
  dimension "d113" = 360
  dimension "d114" = 10
  dimension "d115" = 360
  dimension "d116" = 132
  dimension "d194" = 98
  dimension "d197" = 5
  dimension "d198" = 360
  dimension "d199" = 7
  dimension "d200" = 7
  dimension "d201" = 98
  dimension "d202" = 5
  dimension "d203" = 360
  dimension "d204" = 10
  dimension "d205" = 360
  dimension "d207" = 122
extrude "Extrusion6" add sketch "Skizze8" against normal blind 10 contours L47 A114 L48 A1 | A1 L48 A114 L46 | L107 A114 L108 A1 | A1 L108 A114 L106 | L42 A114 L49 A1 | A1 L49 A114 L43 | L47 A56 L46 A114 | L107 A56 L106 A114 | L42 A56 L43 A114
hole "Bohrung3" at (59.8279, 11.9005, 10) at (-50.7196, 33.8898, 10) at (-50.7196, -33.8898, 10) direction (0, 0, 1) diameter 3.2 end through all
sketch "Skizze9" plane through (-30.2994, 83.7197, 37) normal (0.1950891, 0.9807855, 0) x (0.9807855, -0.1950891, 0)
  line L0 (0, 7) -> (92.1, 7) projected
  line L1 (92.1, 7) -> (0, 7)
  line L2 (0, 7) -> (0, -18.1)
  line L3 (0, -18.1) -> (92.1, -18.1)
  line L4 (92.1, -18.1) -> (92.1, 7)
  line L5 (92.1, 0) -> (0, 0) projected
  line L6 (92.1, 0) -> (0, 0)
  line L7 (0, 0) -> (0, 32.1)
  line L8 (0, 32.1) -> (92.1, 32.1)
  line L9 (92.1, 32.1) -> (92.1, 0)
  line L10 (0, 7) -> (0, 0) projected
  line L11 (92.1, 0) -> (0, 0)
  line L12 (0, 0) -> (0, -3)
  line L13 (0, -3) -> (92.1, -3)
  line L14 (92.1, -3) -> (92.1, 0)
  point P0 (46.05, 37)
  point P1 (0, -3)
  point P2 (92.1, -3)
  dimension "d139" = 25.1
  dimension "d145" = 32.1
  dimension "d146" = 3
extrude "Extrusion7" add sketch "Skizze9" along normal blind 7 contours L7 L8 L9 L0 | L0 L4 L5 L2 | L5 L4 L13 L2
sketch "Skizze10" plane through (0, 0, 37) normal (0, 0, 1) x (1, 0, 0)
  line L0 (51.3817, 22.2692) -> (60.031, 65.752) projected
  line L1 (-30.2994, 83.7197) -> (-38.9486, 40.2369) projected
  line L2 (60.031, 65.752) -> (-30.2994, 83.7197)
  line L3 (-30.2994, 83.7197) -> (-35.1766, 59.2001)
  line L4 (-35.1766, 59.2001) -> (55.1537, 41.2324)
  line L5 (55.1537, 41.2324) -> (60.031, 65.752)
  point P0 (0, 0)
  dimension "d142" = 25
extrude "Extrusion8" add sketch "Skizze10" along normal blind 3
sketch "Skizze12" plane through (-28.9338, 90.5852, 37) normal (0.1950891, 0.9807855, 0) x (0.9807855, -0.1950891, 0)
  line L0 (92.1, -3) -> (92.1, 32.1) projected
  line L1 (0, -3) -> (92.1, -3) projected
  line L2 (92.1, -3) -> (0, -3)
  line L3 (0, -3) -> (0, 16)
  line L4 (0, 16) -> (92.1, 16)
  line L5 (92.1, 16) -> (92.1, -3)
  point P0 (46.05, 37)
  point P1 (46.05, 16)
  point P2 (33.55, 16)
  point P3 (58.55, 16)
  dimension "d147" = 19
  dimension "d148" = 92.1
  dimension "d149" = 46.05
  dimension "d150" = 12.5
  dimension "d151" = 12.5
hole "Bohrung4" at (16.2314, 81.6014, 21) at (3.9716, 84.04, 21) at (28.4912, 79.1627, 21) direction (-0.1950891, -0.9807855, 0) diameter 6.6 depth 15
sketch "Skizze13" plane through (0, 0, 10) normal (0, 0, 1) x (1, 0, 0)
  circle A0 centre (0, 0) radius 47
  circle A1 centre (0, 0) radius 56
  circle A2 centre (0, 0) radius 51.5
  circle A3 centre (-28.6119, 42.8207) radius 6
  circle A4 centre (-42.8207, 28.6119) radius 6
  circle A5 centre (42.8207, 28.6119) radius 6
  circle A6 centre (50.5104, 10.0472) radius 6
  circle A7 centre (-10.0472, -50.5104) radius 6
  circle A8 centre (-28.6119, 42.8207) radius 5
  circle A9 centre (-42.8207, 28.6119) radius 5
  circle A10 centre (-10.0472, -50.5104) radius 5
  circle A11 centre (50.5104, 10.0472) radius 5
  circle A12 centre (42.8207, 28.6119) radius 5
  line L0 (0, 0) -> (-25.4753, 49.8699)
  line L1 (0, 0) -> (-26.4443, 49.3629)
  line L2 (0, 0) -> (-36.3248, 42.6205)
  line L3 (0, 0) -> (-35.4856, 43.3218)
  line L4 (0, 0) -> (-42.6205, 36.3248)
  line L5 (0, 0) -> (-49.3629, 26.4443)
  line L6 (0, 0) -> (-49.8699, 25.4753)
  line L7 (0, 0) -> (-43.3218, 35.4856)
  line L8 (0, 0) -> (-16.2059, -53.6038)
  line L9 (0, 0) -> (-17.2496, -53.2771)
  line L10 (0, 0) -> (-5.541, -55.7252)
  line L11 (0, 0) -> (-4.4517, -55.8228)
  line L12 (0, 0) -> (43.3218, 35.4856)
  line L13 (0, 0) -> (42.6205, 36.3248)
  line L14 (0, 0) -> (49.3629, 26.4443)
  line L15 (0, 0) -> (49.8699, 25.4753)
  line L16 (0, 0) -> (53.6038, 16.2059)
  line L17 (0, 0) -> (53.2771, 17.2496)
  line L18 (0, 0) -> (55.7252, 5.541)
  line L19 (0, 0) -> (55.8228, 4.4517)
  line L20 (0, 0) -> (-54.924, 10.9251)
  line L21 (0, 0) -> (54.924, -10.9251)
  line L22 (0, 0) -> (10.0472, 50.5104)
  point P0 (0, 51.5)
  point P1 (-10.0472, 50.5104)
  point P2 (-19.7082, 47.5798)
  point P3 (-36.416, 36.416)
  point P4 (-47.5798, 19.7082)
  point P5 (-50.5104, 10.0472)
  point P6 (-51.5, 0)
  point P7 (-50.5104, -10.0472)
  point P8 (-47.5798, -19.7082)
  point P9 (-42.8207, -28.6119)
  point P10 (-36.416, -36.416)
  point P11 (-28.6119, -42.8207)
  point P12 (-19.7082, -47.5798)
  point P13 (0, -51.5)
  point P14 (10.0472, -50.5104)
  point P15 (19.7082, -47.5798)
  point P16 (28.6119, -42.8207)
  point P17 (36.416, -36.416)
  point P18 (42.8207, -28.6119)
  point P19 (47.5798, -19.7082)
  point P20 (50.5104, -10.0472)
  point P21 (51.5, 0)
  point P22 (47.5798, 19.7082)
  point P23 (36.416, 36.416)
  point P24 (28.6119, 42.8207)
  point P25 (19.7082, 47.5798)
  point P26 (-41.8551, 21.3811)
  point P27 (-41.4296, 22.1944)
  point P28 (-36.3593, 29.7825)
  point P29 (-35.7708, 30.4869)
  point P30 (-30.3782, 37.0866)
  point P31 (-30.4869, 35.7708)
  point P32 (-29.1766, 36.8473)
  point P33 (-22.6383, 42.2582)
  point P34 (-22.8771, 41.0565)
  point P35 (-21.3811, 41.8551)
  point P36 (-14.4773, -44.7147)
  point P37 (-13.6014, -44.9889)
  point P38 (-3.7363, -46.8513)
  point P39 (-4.6505, -46.7694)
  point P40 (46.7694, 4.6505)
  point P41 (46.8513, 3.7363)
  point P42 (44.7147, 14.4773)
  point P43 (44.9889, 13.6014)
  point P44 (41.4296, 22.1944)
  point P45 (41.8551, 21.3811)
  point P46 (35.7708, 30.4869)
  point P47 (36.3593, 29.7825)
  dimension "d164" = 112
  dimension "d165" = 103
  dimension "d163" = 94
  dimension "d166" = 360
  dimension "d167" = 12
  dimension "d168" = 12
  dimension "d169" = 12
  dimension "d170" = 12
  dimension "d171" = 12
  dimension "d172" = 10
  dimension "d173" = 10
  dimension "d174" = 10
  dimension "d175" = 10
  dimension "d176" = 10
hole "Bohrung5" at (-42.8207, -28.6119, 10) at (-42.8207, 28.6119, 10) at (-28.6119, 42.8207, 10) at (42.8207, 28.6119, 10) at (50.5104, 10.0472, 10) at (50.5104, -10.0472, 10) direction (0, 0, 1) diameter 3 depth 15
sketch "Skizze14" plane through (0, 0, 10) normal (0, 0, -1) x (-1, 0, 0)
  circle A0 centre (0, 0) radius 47
  circle A1 centre (0, 0) radius 56
  circle A2 centre (0, 0) radius 52
  circle A3 centre (0, 52) radius 3
  circle A4 centre (-19.8995, 48.0417) radius 3
  circle A5 centre (-36.7696, 36.7696) radius 3
  circle A6 centre (-48.0417, 19.8995) radius 3
  circle A7 centre (-52, 0) radius 3
  circle A8 centre (-48.0417, -19.8995) radius 3
  circle A9 centre (-36.7696, -36.7696) radius 3
  circle A10 centre (-19.8995, -48.0417) radius 3
  circle A11 centre (0, -52) radius 3
  circle A12 centre (19.8995, -48.0417) radius 3
  circle A13 centre (36.7696, -36.7696) radius 3
  circle A14 centre (48.0417, -19.8995) radius 3
  circle A15 centre (52, 0) radius 3
  circle A16 centre (48.0417, 19.8995) radius 3
  circle A17 centre (36.7696, 36.7696) radius 3
  circle A18 centre (19.8995, 48.0417) radius 3
  circle A19 centre (0, -52) radius 3.5
  circle A20 centre (19.8995, -48.0417) radius 3.5
  line L0 (0, 0) -> (-3.7692, -55.873)
  line L1 (0, 0) -> (24.864, -50.1775)
  line L2 (-54.924, -10.9251) -> (-46.0969, -9.1692)
  line L3 (0, 0) -> (-54.924, -10.9251)
  line L4 (46.0969, 9.1692) -> (54.924, 10.9251)
  line L5 (0, 0) -> (54.924, 10.9251)
  circle A21 centre (0, 0) radius 49
  line L6 (-26.1118, 39.0791) -> (-31.1119, 46.5623)
  line L7 (0, 0) -> (-31.1119, 46.5623)
  line L8 (10.9251, 54.924) -> (9.1692, 46.0969)
  line L9 (0, 0) -> (10.9251, 54.924)
  circle A22 centre (0, 52) radius 4
  circle A23 centre (-10.1447, 51.0008) radius 4
  circle A24 centre (-19.8995, 48.0417) radius 4
  circle A25 centre (-28.8897, 43.2364) radius 4
  circle A26 centre (-36.7696, 36.7696) radius 4
  circle A27 centre (-43.2364, 28.8897) radius 4
  circle A28 centre (-48.0417, 19.8995) radius 4
  circle A29 centre (-51.0008, 10.1447) radius 4
  circle A30 centre (-52, 0) radius 4
  circle A31 centre (-51.0008, -10.1447) radius 4
  circle A32 centre (-48.0417, -19.8995) radius 4
  circle A33 centre (-43.2364, -28.8897) radius 4
  circle A34 centre (-36.7696, -36.7696) radius 4
  circle A35 centre (-28.8897, -43.2364) radius 4
  circle A36 centre (-19.8995, -48.0417) radius 4
  circle A37 centre (-10.1447, -51.0008) radius 4
  circle A38 centre (0, -52) radius 4
  circle A39 centre (10.1447, -51.0008) radius 4
  circle A40 centre (19.8995, -48.0417) radius 4
  circle A41 centre (28.8897, -43.2364) radius 4
  circle A42 centre (36.7696, -36.7696) radius 4
  circle A43 centre (43.2364, -28.8897) radius 4
  circle A44 centre (48.0417, -19.8995) radius 4
  circle A45 centre (51.0008, -10.1447) radius 4
  circle A46 centre (52, 0) radius 4
  circle A47 centre (51.0008, 10.1447) radius 4
  circle A48 centre (48.0417, 19.8995) radius 4
  circle A49 centre (43.2364, 28.8897) radius 4
  circle A50 centre (36.7696, 36.7696) radius 4
  circle A51 centre (28.8897, 43.2364) radius 4
  circle A52 centre (19.8995, 48.0417) radius 4
  circle A53 centre (10.1447, 51.0008) radius 4
  circle A54 centre (28.8897, 43.2364) radius 5 construction
  line L10 (0, 0) -> (26.4906, 49.3381)
  arc A55 (54.924, 10.9251) -> (10.9251, 54.924) centre (0, 0) ccw
  line L11 (0, 0) -> (35.4449, 43.355)
  line L12 (0, 0) -> (5.5933, 55.72)
  line L13 (0, 0) -> (16.1556, 53.619)
  line L14 (0, 0) -> (-16.1556, 53.619)
  line L15 (0, 0) -> (-5.5933, 55.72)
  line L16 (0, 0) -> (-35.4449, 43.355)
  line L17 (0, 0) -> (-26.4906, 49.3381)
  line L18 (0, 0) -> (-49.3381, 26.4906)
  line L19 (0, 0) -> (-43.355, 35.4449)
  line L20 (0, 0) -> (-55.72, 5.5933)
  line L21 (0, 0) -> (-53.619, 16.1556)
  line L22 (0, 0) -> (-53.619, -16.1556)
  line L23 (0, 0) -> (-55.72, -5.5933)
  line L24 (0, 0) -> (-43.355, -35.4449)
  line L25 (0, 0) -> (-49.3381, -26.4906)
  line L26 (0, 0) -> (-26.4906, -49.3381)
  line L27 (0, 0) -> (-35.4449, -43.355)
  line L28 (0, 0) -> (-5.5933, -55.72)
  line L29 (0, 0) -> (-16.1556, -53.619)
  line L30 (0, 0) -> (16.1556, -53.619)
  line L31 (0, 0) -> (5.5933, -55.72)
  line L32 (0, 0) -> (35.4449, -43.355)
  line L33 (0, 0) -> (26.4906, -49.3381)
  line L34 (0, 0) -> (49.3381, -26.4906)
  line L35 (0, 0) -> (43.355, -35.4449)
  line L36 (0, 0) -> (55.72, -5.5933)
  line L37 (0, 0) -> (53.619, -16.1556)
  line L38 (0, 0) -> (53.619, 16.1556)
  line L39 (0, 0) -> (55.72, 5.5933)
  line L40 (0, 0) -> (43.355, 35.4449)
  line L41 (0, 0) -> (49.3381, 26.4906)
  point P0 (21.756, -43.9053)
  point P1 (-3.2981, -48.8889)
  point P2 (-48.0585, -9.5594)
  point P3 (48.0585, 9.5594)
  point P4 (-46.765, 4.6944)
  point P5 (-45.0017, 13.5592)
  point P6 (-41.4087, 22.2332)
  point P7 (-36.3872, 29.7484)
  point P8 (13.5592, -45.0017)
  point P9 (4.6944, -46.765)
  point P10 (36.3872, 29.7484)
  point P11 (41.4087, 22.2332)
  point P12 (22.2332, 41.4087)
  point P13 (29.7484, 36.3872)
  point P14 (48.4591, 17.4346)
  point P15 (34.652, 38.0984)
  point P16 (17.4346, 48.4591)
  point P17 (-38.0984, 34.652)
  point P18 (-21.9376, 46.5939)
  point P19 (2.437, 51.4423)
  point P20 (-48.4591, 17.4346)
  point P21 (-51.4423, 2.437)
  point P22 (-13.5592, -45.0017)
  point P23 (-22.2332, -41.4087)
  point P24 (41.4087, -22.2332)
  dimension "d226" = 104
  dimension "d224" = 94
  dimension "d225" = 112
  dimension "d227" = 6
  dimension "d228" = 360
  dimension "d229" = 7
  dimension "d230" = 7
  dimension "d231" = 98
  dimension "d232" = 8
  dimension "d233" = 360
  dimension "d234" = 10
  dimension "d235" = 360
hole "Bohrung6" at (-48.0417, 19.8995, 10) at (-36.7696, 36.7696, 10) at (-19.8995, 48.0417, 10) at (36.7696, 36.7696, 10) at (48.0417, 19.8995, 10) at (52, 0, 10) direction (0, 0, 1) diameter 6 end through all
equation "\"d1\" = Aussenradius"
equation "\"d2\" = 0.5 * Innenradius + 0.5 * Aussenradius"
equation "\"d0\" = Innenradius"
equation "\"d7\" = PlateaudurchmesserObererMount"
equation "\"d8\" = PlateaudurchmesserObererMount"
equation "\"d9\" = PlateaudurchmesserObererMount"
equation "\"d10\" = PlateaudurchmesserObererMount"
equation "\"d11\" = PlateaudurchmesserObererMount"
equation "\"d12\" = Plateaudurchmesser"
equation "\"d13\" = Plateaudurchmesser"
equation "\"d14\" = Plateaudurchmesser"
equation "\"d15\" = Plateaudurchmesser"
equation "\"d16\" = Plateaudurchmesser"
equation "\"d19\" = Innenradius"
equation "\"d81\" = d95"
equation "\"d82\" = 0.5 * d94 + 0.5 * d95"
equation "\"d20\" = Aussenradius"
equation "\"d21\" = ExtrusionVerbindungselemente"
equation "\"d30\" = Innenradius"
equation "\"d31\" = Aussenradius"
equation "\"d32\" = ExtrusionVerbindungsring"
equation "\"AuslegerBreite\" = 92.1"
equation "\"d34\" = AuslegerLaenge"
equation "\"d37\" = -0.5 * d40 + 0.5 * AuslegerBreite"
equation "\"d39\" = AuslegerBreite"
equation "\"d55\" = Aussenradius"
equation "\"d35\" = AulegerDicke"
equation "\"d59\" = d73"
equation "\"d60\" = 0.5 * d72 + 0.5 * d73"
equation "\"d62\" = d74"
equation "\"d63\" = d74"
equation "\"d64\" = d74"
equation "\"d65\" = d74"
equation "\"d66\" = d74"
equation "\"d67\" = d75"
equation "\"d68\" = d75"
equation "\"d69\" = d75"
equation "\"d70\" = d75"
equation "\"d71\" = d75"
equation "\"ExtrusionVerbindungselemente\" = 10"
equation "\"ExtrusionVerbindungsring\" = 10"
equation "\"AuslegerLaenge\" = LochabstandVomZentrum - LochabstandWand"
equation "\"AulegerDicke\" = 7"
equation "\"m4\" = 4"
equation "\"LochabstandHalterungZentral\" = 19"
equation "\"LochabstandWand\" = 19"
equation "\"LochabstandHalterungAussen\" = 85"
equation "\"LochabstandVomZentrum\" = 56.49"
equation "\"d117\" = 94"
equation "\"d118\" = 112"
equation "\"d119\" = 104"
equation "\"d120\" = 5"
equation "\"d121\" = 7"
equation "\"d122\" = 94"
equation "\"d123\" = 5"
equation "\"d124\" = 10"
equation "\"d125\" = 112"
equation "\"HoehenfixierungSchaft\" = 3.2"
equation "\"StufenhoeheFuerNewport\" = 3"
equation "\"MittelpunktZuAussenseiteNewport\" = 76.2"
equation "\"NewportFusshoehe\" = 35.1"
equation "\"StufenbreiteNewport\" = 25"
equation "\"NewportSchraubenhoehe\" = 19"
equation "\"NewportSchraubenabstand\" = 12.5"
equation "\"NewportSchraubendurchmesser\" = 6.6"
equation "\"d179\" = 12"
equation "\"d208\" = 98"
equation "\"d209\" = 112"
equation "\"d210\" = 104"
equation "\"d211\" = 5"
equation "\"d212\" = 7"
equation "\"d213\" = 98"
equation "\"d214\" = 5"
equation "\"d215\" = 10"
equation "\"d216\" = 112"
equation "\"d217\" = 20"
equation "\"d236\" = 94"
equation "\"d237\" = 112"
equation "\"d238\" = 104"
equation "\"d239\" = 6"
equation "\"d240\" = 7"
equation "\"d241\" = 98"
equation "\"d242\" = 8"
equation "\"d243\" = 10"
equation "\"Aussenradius\" = 112"
equation "\"Innenradius\" = 94"
equation "\"PlateaudurchmesserObererMount\" = 12"
equation "\"Plateaudurchmesser\" = 10"
equation "\"d95\" = 112"
equation "\"d94\" = 98"
equation "\"d73\" = 112"
equation "\"d72\" = 98"
equation "\"d74\" = 12"
equation "\"d75\" = 10"
properties part number "02" material "Edelstahl"
